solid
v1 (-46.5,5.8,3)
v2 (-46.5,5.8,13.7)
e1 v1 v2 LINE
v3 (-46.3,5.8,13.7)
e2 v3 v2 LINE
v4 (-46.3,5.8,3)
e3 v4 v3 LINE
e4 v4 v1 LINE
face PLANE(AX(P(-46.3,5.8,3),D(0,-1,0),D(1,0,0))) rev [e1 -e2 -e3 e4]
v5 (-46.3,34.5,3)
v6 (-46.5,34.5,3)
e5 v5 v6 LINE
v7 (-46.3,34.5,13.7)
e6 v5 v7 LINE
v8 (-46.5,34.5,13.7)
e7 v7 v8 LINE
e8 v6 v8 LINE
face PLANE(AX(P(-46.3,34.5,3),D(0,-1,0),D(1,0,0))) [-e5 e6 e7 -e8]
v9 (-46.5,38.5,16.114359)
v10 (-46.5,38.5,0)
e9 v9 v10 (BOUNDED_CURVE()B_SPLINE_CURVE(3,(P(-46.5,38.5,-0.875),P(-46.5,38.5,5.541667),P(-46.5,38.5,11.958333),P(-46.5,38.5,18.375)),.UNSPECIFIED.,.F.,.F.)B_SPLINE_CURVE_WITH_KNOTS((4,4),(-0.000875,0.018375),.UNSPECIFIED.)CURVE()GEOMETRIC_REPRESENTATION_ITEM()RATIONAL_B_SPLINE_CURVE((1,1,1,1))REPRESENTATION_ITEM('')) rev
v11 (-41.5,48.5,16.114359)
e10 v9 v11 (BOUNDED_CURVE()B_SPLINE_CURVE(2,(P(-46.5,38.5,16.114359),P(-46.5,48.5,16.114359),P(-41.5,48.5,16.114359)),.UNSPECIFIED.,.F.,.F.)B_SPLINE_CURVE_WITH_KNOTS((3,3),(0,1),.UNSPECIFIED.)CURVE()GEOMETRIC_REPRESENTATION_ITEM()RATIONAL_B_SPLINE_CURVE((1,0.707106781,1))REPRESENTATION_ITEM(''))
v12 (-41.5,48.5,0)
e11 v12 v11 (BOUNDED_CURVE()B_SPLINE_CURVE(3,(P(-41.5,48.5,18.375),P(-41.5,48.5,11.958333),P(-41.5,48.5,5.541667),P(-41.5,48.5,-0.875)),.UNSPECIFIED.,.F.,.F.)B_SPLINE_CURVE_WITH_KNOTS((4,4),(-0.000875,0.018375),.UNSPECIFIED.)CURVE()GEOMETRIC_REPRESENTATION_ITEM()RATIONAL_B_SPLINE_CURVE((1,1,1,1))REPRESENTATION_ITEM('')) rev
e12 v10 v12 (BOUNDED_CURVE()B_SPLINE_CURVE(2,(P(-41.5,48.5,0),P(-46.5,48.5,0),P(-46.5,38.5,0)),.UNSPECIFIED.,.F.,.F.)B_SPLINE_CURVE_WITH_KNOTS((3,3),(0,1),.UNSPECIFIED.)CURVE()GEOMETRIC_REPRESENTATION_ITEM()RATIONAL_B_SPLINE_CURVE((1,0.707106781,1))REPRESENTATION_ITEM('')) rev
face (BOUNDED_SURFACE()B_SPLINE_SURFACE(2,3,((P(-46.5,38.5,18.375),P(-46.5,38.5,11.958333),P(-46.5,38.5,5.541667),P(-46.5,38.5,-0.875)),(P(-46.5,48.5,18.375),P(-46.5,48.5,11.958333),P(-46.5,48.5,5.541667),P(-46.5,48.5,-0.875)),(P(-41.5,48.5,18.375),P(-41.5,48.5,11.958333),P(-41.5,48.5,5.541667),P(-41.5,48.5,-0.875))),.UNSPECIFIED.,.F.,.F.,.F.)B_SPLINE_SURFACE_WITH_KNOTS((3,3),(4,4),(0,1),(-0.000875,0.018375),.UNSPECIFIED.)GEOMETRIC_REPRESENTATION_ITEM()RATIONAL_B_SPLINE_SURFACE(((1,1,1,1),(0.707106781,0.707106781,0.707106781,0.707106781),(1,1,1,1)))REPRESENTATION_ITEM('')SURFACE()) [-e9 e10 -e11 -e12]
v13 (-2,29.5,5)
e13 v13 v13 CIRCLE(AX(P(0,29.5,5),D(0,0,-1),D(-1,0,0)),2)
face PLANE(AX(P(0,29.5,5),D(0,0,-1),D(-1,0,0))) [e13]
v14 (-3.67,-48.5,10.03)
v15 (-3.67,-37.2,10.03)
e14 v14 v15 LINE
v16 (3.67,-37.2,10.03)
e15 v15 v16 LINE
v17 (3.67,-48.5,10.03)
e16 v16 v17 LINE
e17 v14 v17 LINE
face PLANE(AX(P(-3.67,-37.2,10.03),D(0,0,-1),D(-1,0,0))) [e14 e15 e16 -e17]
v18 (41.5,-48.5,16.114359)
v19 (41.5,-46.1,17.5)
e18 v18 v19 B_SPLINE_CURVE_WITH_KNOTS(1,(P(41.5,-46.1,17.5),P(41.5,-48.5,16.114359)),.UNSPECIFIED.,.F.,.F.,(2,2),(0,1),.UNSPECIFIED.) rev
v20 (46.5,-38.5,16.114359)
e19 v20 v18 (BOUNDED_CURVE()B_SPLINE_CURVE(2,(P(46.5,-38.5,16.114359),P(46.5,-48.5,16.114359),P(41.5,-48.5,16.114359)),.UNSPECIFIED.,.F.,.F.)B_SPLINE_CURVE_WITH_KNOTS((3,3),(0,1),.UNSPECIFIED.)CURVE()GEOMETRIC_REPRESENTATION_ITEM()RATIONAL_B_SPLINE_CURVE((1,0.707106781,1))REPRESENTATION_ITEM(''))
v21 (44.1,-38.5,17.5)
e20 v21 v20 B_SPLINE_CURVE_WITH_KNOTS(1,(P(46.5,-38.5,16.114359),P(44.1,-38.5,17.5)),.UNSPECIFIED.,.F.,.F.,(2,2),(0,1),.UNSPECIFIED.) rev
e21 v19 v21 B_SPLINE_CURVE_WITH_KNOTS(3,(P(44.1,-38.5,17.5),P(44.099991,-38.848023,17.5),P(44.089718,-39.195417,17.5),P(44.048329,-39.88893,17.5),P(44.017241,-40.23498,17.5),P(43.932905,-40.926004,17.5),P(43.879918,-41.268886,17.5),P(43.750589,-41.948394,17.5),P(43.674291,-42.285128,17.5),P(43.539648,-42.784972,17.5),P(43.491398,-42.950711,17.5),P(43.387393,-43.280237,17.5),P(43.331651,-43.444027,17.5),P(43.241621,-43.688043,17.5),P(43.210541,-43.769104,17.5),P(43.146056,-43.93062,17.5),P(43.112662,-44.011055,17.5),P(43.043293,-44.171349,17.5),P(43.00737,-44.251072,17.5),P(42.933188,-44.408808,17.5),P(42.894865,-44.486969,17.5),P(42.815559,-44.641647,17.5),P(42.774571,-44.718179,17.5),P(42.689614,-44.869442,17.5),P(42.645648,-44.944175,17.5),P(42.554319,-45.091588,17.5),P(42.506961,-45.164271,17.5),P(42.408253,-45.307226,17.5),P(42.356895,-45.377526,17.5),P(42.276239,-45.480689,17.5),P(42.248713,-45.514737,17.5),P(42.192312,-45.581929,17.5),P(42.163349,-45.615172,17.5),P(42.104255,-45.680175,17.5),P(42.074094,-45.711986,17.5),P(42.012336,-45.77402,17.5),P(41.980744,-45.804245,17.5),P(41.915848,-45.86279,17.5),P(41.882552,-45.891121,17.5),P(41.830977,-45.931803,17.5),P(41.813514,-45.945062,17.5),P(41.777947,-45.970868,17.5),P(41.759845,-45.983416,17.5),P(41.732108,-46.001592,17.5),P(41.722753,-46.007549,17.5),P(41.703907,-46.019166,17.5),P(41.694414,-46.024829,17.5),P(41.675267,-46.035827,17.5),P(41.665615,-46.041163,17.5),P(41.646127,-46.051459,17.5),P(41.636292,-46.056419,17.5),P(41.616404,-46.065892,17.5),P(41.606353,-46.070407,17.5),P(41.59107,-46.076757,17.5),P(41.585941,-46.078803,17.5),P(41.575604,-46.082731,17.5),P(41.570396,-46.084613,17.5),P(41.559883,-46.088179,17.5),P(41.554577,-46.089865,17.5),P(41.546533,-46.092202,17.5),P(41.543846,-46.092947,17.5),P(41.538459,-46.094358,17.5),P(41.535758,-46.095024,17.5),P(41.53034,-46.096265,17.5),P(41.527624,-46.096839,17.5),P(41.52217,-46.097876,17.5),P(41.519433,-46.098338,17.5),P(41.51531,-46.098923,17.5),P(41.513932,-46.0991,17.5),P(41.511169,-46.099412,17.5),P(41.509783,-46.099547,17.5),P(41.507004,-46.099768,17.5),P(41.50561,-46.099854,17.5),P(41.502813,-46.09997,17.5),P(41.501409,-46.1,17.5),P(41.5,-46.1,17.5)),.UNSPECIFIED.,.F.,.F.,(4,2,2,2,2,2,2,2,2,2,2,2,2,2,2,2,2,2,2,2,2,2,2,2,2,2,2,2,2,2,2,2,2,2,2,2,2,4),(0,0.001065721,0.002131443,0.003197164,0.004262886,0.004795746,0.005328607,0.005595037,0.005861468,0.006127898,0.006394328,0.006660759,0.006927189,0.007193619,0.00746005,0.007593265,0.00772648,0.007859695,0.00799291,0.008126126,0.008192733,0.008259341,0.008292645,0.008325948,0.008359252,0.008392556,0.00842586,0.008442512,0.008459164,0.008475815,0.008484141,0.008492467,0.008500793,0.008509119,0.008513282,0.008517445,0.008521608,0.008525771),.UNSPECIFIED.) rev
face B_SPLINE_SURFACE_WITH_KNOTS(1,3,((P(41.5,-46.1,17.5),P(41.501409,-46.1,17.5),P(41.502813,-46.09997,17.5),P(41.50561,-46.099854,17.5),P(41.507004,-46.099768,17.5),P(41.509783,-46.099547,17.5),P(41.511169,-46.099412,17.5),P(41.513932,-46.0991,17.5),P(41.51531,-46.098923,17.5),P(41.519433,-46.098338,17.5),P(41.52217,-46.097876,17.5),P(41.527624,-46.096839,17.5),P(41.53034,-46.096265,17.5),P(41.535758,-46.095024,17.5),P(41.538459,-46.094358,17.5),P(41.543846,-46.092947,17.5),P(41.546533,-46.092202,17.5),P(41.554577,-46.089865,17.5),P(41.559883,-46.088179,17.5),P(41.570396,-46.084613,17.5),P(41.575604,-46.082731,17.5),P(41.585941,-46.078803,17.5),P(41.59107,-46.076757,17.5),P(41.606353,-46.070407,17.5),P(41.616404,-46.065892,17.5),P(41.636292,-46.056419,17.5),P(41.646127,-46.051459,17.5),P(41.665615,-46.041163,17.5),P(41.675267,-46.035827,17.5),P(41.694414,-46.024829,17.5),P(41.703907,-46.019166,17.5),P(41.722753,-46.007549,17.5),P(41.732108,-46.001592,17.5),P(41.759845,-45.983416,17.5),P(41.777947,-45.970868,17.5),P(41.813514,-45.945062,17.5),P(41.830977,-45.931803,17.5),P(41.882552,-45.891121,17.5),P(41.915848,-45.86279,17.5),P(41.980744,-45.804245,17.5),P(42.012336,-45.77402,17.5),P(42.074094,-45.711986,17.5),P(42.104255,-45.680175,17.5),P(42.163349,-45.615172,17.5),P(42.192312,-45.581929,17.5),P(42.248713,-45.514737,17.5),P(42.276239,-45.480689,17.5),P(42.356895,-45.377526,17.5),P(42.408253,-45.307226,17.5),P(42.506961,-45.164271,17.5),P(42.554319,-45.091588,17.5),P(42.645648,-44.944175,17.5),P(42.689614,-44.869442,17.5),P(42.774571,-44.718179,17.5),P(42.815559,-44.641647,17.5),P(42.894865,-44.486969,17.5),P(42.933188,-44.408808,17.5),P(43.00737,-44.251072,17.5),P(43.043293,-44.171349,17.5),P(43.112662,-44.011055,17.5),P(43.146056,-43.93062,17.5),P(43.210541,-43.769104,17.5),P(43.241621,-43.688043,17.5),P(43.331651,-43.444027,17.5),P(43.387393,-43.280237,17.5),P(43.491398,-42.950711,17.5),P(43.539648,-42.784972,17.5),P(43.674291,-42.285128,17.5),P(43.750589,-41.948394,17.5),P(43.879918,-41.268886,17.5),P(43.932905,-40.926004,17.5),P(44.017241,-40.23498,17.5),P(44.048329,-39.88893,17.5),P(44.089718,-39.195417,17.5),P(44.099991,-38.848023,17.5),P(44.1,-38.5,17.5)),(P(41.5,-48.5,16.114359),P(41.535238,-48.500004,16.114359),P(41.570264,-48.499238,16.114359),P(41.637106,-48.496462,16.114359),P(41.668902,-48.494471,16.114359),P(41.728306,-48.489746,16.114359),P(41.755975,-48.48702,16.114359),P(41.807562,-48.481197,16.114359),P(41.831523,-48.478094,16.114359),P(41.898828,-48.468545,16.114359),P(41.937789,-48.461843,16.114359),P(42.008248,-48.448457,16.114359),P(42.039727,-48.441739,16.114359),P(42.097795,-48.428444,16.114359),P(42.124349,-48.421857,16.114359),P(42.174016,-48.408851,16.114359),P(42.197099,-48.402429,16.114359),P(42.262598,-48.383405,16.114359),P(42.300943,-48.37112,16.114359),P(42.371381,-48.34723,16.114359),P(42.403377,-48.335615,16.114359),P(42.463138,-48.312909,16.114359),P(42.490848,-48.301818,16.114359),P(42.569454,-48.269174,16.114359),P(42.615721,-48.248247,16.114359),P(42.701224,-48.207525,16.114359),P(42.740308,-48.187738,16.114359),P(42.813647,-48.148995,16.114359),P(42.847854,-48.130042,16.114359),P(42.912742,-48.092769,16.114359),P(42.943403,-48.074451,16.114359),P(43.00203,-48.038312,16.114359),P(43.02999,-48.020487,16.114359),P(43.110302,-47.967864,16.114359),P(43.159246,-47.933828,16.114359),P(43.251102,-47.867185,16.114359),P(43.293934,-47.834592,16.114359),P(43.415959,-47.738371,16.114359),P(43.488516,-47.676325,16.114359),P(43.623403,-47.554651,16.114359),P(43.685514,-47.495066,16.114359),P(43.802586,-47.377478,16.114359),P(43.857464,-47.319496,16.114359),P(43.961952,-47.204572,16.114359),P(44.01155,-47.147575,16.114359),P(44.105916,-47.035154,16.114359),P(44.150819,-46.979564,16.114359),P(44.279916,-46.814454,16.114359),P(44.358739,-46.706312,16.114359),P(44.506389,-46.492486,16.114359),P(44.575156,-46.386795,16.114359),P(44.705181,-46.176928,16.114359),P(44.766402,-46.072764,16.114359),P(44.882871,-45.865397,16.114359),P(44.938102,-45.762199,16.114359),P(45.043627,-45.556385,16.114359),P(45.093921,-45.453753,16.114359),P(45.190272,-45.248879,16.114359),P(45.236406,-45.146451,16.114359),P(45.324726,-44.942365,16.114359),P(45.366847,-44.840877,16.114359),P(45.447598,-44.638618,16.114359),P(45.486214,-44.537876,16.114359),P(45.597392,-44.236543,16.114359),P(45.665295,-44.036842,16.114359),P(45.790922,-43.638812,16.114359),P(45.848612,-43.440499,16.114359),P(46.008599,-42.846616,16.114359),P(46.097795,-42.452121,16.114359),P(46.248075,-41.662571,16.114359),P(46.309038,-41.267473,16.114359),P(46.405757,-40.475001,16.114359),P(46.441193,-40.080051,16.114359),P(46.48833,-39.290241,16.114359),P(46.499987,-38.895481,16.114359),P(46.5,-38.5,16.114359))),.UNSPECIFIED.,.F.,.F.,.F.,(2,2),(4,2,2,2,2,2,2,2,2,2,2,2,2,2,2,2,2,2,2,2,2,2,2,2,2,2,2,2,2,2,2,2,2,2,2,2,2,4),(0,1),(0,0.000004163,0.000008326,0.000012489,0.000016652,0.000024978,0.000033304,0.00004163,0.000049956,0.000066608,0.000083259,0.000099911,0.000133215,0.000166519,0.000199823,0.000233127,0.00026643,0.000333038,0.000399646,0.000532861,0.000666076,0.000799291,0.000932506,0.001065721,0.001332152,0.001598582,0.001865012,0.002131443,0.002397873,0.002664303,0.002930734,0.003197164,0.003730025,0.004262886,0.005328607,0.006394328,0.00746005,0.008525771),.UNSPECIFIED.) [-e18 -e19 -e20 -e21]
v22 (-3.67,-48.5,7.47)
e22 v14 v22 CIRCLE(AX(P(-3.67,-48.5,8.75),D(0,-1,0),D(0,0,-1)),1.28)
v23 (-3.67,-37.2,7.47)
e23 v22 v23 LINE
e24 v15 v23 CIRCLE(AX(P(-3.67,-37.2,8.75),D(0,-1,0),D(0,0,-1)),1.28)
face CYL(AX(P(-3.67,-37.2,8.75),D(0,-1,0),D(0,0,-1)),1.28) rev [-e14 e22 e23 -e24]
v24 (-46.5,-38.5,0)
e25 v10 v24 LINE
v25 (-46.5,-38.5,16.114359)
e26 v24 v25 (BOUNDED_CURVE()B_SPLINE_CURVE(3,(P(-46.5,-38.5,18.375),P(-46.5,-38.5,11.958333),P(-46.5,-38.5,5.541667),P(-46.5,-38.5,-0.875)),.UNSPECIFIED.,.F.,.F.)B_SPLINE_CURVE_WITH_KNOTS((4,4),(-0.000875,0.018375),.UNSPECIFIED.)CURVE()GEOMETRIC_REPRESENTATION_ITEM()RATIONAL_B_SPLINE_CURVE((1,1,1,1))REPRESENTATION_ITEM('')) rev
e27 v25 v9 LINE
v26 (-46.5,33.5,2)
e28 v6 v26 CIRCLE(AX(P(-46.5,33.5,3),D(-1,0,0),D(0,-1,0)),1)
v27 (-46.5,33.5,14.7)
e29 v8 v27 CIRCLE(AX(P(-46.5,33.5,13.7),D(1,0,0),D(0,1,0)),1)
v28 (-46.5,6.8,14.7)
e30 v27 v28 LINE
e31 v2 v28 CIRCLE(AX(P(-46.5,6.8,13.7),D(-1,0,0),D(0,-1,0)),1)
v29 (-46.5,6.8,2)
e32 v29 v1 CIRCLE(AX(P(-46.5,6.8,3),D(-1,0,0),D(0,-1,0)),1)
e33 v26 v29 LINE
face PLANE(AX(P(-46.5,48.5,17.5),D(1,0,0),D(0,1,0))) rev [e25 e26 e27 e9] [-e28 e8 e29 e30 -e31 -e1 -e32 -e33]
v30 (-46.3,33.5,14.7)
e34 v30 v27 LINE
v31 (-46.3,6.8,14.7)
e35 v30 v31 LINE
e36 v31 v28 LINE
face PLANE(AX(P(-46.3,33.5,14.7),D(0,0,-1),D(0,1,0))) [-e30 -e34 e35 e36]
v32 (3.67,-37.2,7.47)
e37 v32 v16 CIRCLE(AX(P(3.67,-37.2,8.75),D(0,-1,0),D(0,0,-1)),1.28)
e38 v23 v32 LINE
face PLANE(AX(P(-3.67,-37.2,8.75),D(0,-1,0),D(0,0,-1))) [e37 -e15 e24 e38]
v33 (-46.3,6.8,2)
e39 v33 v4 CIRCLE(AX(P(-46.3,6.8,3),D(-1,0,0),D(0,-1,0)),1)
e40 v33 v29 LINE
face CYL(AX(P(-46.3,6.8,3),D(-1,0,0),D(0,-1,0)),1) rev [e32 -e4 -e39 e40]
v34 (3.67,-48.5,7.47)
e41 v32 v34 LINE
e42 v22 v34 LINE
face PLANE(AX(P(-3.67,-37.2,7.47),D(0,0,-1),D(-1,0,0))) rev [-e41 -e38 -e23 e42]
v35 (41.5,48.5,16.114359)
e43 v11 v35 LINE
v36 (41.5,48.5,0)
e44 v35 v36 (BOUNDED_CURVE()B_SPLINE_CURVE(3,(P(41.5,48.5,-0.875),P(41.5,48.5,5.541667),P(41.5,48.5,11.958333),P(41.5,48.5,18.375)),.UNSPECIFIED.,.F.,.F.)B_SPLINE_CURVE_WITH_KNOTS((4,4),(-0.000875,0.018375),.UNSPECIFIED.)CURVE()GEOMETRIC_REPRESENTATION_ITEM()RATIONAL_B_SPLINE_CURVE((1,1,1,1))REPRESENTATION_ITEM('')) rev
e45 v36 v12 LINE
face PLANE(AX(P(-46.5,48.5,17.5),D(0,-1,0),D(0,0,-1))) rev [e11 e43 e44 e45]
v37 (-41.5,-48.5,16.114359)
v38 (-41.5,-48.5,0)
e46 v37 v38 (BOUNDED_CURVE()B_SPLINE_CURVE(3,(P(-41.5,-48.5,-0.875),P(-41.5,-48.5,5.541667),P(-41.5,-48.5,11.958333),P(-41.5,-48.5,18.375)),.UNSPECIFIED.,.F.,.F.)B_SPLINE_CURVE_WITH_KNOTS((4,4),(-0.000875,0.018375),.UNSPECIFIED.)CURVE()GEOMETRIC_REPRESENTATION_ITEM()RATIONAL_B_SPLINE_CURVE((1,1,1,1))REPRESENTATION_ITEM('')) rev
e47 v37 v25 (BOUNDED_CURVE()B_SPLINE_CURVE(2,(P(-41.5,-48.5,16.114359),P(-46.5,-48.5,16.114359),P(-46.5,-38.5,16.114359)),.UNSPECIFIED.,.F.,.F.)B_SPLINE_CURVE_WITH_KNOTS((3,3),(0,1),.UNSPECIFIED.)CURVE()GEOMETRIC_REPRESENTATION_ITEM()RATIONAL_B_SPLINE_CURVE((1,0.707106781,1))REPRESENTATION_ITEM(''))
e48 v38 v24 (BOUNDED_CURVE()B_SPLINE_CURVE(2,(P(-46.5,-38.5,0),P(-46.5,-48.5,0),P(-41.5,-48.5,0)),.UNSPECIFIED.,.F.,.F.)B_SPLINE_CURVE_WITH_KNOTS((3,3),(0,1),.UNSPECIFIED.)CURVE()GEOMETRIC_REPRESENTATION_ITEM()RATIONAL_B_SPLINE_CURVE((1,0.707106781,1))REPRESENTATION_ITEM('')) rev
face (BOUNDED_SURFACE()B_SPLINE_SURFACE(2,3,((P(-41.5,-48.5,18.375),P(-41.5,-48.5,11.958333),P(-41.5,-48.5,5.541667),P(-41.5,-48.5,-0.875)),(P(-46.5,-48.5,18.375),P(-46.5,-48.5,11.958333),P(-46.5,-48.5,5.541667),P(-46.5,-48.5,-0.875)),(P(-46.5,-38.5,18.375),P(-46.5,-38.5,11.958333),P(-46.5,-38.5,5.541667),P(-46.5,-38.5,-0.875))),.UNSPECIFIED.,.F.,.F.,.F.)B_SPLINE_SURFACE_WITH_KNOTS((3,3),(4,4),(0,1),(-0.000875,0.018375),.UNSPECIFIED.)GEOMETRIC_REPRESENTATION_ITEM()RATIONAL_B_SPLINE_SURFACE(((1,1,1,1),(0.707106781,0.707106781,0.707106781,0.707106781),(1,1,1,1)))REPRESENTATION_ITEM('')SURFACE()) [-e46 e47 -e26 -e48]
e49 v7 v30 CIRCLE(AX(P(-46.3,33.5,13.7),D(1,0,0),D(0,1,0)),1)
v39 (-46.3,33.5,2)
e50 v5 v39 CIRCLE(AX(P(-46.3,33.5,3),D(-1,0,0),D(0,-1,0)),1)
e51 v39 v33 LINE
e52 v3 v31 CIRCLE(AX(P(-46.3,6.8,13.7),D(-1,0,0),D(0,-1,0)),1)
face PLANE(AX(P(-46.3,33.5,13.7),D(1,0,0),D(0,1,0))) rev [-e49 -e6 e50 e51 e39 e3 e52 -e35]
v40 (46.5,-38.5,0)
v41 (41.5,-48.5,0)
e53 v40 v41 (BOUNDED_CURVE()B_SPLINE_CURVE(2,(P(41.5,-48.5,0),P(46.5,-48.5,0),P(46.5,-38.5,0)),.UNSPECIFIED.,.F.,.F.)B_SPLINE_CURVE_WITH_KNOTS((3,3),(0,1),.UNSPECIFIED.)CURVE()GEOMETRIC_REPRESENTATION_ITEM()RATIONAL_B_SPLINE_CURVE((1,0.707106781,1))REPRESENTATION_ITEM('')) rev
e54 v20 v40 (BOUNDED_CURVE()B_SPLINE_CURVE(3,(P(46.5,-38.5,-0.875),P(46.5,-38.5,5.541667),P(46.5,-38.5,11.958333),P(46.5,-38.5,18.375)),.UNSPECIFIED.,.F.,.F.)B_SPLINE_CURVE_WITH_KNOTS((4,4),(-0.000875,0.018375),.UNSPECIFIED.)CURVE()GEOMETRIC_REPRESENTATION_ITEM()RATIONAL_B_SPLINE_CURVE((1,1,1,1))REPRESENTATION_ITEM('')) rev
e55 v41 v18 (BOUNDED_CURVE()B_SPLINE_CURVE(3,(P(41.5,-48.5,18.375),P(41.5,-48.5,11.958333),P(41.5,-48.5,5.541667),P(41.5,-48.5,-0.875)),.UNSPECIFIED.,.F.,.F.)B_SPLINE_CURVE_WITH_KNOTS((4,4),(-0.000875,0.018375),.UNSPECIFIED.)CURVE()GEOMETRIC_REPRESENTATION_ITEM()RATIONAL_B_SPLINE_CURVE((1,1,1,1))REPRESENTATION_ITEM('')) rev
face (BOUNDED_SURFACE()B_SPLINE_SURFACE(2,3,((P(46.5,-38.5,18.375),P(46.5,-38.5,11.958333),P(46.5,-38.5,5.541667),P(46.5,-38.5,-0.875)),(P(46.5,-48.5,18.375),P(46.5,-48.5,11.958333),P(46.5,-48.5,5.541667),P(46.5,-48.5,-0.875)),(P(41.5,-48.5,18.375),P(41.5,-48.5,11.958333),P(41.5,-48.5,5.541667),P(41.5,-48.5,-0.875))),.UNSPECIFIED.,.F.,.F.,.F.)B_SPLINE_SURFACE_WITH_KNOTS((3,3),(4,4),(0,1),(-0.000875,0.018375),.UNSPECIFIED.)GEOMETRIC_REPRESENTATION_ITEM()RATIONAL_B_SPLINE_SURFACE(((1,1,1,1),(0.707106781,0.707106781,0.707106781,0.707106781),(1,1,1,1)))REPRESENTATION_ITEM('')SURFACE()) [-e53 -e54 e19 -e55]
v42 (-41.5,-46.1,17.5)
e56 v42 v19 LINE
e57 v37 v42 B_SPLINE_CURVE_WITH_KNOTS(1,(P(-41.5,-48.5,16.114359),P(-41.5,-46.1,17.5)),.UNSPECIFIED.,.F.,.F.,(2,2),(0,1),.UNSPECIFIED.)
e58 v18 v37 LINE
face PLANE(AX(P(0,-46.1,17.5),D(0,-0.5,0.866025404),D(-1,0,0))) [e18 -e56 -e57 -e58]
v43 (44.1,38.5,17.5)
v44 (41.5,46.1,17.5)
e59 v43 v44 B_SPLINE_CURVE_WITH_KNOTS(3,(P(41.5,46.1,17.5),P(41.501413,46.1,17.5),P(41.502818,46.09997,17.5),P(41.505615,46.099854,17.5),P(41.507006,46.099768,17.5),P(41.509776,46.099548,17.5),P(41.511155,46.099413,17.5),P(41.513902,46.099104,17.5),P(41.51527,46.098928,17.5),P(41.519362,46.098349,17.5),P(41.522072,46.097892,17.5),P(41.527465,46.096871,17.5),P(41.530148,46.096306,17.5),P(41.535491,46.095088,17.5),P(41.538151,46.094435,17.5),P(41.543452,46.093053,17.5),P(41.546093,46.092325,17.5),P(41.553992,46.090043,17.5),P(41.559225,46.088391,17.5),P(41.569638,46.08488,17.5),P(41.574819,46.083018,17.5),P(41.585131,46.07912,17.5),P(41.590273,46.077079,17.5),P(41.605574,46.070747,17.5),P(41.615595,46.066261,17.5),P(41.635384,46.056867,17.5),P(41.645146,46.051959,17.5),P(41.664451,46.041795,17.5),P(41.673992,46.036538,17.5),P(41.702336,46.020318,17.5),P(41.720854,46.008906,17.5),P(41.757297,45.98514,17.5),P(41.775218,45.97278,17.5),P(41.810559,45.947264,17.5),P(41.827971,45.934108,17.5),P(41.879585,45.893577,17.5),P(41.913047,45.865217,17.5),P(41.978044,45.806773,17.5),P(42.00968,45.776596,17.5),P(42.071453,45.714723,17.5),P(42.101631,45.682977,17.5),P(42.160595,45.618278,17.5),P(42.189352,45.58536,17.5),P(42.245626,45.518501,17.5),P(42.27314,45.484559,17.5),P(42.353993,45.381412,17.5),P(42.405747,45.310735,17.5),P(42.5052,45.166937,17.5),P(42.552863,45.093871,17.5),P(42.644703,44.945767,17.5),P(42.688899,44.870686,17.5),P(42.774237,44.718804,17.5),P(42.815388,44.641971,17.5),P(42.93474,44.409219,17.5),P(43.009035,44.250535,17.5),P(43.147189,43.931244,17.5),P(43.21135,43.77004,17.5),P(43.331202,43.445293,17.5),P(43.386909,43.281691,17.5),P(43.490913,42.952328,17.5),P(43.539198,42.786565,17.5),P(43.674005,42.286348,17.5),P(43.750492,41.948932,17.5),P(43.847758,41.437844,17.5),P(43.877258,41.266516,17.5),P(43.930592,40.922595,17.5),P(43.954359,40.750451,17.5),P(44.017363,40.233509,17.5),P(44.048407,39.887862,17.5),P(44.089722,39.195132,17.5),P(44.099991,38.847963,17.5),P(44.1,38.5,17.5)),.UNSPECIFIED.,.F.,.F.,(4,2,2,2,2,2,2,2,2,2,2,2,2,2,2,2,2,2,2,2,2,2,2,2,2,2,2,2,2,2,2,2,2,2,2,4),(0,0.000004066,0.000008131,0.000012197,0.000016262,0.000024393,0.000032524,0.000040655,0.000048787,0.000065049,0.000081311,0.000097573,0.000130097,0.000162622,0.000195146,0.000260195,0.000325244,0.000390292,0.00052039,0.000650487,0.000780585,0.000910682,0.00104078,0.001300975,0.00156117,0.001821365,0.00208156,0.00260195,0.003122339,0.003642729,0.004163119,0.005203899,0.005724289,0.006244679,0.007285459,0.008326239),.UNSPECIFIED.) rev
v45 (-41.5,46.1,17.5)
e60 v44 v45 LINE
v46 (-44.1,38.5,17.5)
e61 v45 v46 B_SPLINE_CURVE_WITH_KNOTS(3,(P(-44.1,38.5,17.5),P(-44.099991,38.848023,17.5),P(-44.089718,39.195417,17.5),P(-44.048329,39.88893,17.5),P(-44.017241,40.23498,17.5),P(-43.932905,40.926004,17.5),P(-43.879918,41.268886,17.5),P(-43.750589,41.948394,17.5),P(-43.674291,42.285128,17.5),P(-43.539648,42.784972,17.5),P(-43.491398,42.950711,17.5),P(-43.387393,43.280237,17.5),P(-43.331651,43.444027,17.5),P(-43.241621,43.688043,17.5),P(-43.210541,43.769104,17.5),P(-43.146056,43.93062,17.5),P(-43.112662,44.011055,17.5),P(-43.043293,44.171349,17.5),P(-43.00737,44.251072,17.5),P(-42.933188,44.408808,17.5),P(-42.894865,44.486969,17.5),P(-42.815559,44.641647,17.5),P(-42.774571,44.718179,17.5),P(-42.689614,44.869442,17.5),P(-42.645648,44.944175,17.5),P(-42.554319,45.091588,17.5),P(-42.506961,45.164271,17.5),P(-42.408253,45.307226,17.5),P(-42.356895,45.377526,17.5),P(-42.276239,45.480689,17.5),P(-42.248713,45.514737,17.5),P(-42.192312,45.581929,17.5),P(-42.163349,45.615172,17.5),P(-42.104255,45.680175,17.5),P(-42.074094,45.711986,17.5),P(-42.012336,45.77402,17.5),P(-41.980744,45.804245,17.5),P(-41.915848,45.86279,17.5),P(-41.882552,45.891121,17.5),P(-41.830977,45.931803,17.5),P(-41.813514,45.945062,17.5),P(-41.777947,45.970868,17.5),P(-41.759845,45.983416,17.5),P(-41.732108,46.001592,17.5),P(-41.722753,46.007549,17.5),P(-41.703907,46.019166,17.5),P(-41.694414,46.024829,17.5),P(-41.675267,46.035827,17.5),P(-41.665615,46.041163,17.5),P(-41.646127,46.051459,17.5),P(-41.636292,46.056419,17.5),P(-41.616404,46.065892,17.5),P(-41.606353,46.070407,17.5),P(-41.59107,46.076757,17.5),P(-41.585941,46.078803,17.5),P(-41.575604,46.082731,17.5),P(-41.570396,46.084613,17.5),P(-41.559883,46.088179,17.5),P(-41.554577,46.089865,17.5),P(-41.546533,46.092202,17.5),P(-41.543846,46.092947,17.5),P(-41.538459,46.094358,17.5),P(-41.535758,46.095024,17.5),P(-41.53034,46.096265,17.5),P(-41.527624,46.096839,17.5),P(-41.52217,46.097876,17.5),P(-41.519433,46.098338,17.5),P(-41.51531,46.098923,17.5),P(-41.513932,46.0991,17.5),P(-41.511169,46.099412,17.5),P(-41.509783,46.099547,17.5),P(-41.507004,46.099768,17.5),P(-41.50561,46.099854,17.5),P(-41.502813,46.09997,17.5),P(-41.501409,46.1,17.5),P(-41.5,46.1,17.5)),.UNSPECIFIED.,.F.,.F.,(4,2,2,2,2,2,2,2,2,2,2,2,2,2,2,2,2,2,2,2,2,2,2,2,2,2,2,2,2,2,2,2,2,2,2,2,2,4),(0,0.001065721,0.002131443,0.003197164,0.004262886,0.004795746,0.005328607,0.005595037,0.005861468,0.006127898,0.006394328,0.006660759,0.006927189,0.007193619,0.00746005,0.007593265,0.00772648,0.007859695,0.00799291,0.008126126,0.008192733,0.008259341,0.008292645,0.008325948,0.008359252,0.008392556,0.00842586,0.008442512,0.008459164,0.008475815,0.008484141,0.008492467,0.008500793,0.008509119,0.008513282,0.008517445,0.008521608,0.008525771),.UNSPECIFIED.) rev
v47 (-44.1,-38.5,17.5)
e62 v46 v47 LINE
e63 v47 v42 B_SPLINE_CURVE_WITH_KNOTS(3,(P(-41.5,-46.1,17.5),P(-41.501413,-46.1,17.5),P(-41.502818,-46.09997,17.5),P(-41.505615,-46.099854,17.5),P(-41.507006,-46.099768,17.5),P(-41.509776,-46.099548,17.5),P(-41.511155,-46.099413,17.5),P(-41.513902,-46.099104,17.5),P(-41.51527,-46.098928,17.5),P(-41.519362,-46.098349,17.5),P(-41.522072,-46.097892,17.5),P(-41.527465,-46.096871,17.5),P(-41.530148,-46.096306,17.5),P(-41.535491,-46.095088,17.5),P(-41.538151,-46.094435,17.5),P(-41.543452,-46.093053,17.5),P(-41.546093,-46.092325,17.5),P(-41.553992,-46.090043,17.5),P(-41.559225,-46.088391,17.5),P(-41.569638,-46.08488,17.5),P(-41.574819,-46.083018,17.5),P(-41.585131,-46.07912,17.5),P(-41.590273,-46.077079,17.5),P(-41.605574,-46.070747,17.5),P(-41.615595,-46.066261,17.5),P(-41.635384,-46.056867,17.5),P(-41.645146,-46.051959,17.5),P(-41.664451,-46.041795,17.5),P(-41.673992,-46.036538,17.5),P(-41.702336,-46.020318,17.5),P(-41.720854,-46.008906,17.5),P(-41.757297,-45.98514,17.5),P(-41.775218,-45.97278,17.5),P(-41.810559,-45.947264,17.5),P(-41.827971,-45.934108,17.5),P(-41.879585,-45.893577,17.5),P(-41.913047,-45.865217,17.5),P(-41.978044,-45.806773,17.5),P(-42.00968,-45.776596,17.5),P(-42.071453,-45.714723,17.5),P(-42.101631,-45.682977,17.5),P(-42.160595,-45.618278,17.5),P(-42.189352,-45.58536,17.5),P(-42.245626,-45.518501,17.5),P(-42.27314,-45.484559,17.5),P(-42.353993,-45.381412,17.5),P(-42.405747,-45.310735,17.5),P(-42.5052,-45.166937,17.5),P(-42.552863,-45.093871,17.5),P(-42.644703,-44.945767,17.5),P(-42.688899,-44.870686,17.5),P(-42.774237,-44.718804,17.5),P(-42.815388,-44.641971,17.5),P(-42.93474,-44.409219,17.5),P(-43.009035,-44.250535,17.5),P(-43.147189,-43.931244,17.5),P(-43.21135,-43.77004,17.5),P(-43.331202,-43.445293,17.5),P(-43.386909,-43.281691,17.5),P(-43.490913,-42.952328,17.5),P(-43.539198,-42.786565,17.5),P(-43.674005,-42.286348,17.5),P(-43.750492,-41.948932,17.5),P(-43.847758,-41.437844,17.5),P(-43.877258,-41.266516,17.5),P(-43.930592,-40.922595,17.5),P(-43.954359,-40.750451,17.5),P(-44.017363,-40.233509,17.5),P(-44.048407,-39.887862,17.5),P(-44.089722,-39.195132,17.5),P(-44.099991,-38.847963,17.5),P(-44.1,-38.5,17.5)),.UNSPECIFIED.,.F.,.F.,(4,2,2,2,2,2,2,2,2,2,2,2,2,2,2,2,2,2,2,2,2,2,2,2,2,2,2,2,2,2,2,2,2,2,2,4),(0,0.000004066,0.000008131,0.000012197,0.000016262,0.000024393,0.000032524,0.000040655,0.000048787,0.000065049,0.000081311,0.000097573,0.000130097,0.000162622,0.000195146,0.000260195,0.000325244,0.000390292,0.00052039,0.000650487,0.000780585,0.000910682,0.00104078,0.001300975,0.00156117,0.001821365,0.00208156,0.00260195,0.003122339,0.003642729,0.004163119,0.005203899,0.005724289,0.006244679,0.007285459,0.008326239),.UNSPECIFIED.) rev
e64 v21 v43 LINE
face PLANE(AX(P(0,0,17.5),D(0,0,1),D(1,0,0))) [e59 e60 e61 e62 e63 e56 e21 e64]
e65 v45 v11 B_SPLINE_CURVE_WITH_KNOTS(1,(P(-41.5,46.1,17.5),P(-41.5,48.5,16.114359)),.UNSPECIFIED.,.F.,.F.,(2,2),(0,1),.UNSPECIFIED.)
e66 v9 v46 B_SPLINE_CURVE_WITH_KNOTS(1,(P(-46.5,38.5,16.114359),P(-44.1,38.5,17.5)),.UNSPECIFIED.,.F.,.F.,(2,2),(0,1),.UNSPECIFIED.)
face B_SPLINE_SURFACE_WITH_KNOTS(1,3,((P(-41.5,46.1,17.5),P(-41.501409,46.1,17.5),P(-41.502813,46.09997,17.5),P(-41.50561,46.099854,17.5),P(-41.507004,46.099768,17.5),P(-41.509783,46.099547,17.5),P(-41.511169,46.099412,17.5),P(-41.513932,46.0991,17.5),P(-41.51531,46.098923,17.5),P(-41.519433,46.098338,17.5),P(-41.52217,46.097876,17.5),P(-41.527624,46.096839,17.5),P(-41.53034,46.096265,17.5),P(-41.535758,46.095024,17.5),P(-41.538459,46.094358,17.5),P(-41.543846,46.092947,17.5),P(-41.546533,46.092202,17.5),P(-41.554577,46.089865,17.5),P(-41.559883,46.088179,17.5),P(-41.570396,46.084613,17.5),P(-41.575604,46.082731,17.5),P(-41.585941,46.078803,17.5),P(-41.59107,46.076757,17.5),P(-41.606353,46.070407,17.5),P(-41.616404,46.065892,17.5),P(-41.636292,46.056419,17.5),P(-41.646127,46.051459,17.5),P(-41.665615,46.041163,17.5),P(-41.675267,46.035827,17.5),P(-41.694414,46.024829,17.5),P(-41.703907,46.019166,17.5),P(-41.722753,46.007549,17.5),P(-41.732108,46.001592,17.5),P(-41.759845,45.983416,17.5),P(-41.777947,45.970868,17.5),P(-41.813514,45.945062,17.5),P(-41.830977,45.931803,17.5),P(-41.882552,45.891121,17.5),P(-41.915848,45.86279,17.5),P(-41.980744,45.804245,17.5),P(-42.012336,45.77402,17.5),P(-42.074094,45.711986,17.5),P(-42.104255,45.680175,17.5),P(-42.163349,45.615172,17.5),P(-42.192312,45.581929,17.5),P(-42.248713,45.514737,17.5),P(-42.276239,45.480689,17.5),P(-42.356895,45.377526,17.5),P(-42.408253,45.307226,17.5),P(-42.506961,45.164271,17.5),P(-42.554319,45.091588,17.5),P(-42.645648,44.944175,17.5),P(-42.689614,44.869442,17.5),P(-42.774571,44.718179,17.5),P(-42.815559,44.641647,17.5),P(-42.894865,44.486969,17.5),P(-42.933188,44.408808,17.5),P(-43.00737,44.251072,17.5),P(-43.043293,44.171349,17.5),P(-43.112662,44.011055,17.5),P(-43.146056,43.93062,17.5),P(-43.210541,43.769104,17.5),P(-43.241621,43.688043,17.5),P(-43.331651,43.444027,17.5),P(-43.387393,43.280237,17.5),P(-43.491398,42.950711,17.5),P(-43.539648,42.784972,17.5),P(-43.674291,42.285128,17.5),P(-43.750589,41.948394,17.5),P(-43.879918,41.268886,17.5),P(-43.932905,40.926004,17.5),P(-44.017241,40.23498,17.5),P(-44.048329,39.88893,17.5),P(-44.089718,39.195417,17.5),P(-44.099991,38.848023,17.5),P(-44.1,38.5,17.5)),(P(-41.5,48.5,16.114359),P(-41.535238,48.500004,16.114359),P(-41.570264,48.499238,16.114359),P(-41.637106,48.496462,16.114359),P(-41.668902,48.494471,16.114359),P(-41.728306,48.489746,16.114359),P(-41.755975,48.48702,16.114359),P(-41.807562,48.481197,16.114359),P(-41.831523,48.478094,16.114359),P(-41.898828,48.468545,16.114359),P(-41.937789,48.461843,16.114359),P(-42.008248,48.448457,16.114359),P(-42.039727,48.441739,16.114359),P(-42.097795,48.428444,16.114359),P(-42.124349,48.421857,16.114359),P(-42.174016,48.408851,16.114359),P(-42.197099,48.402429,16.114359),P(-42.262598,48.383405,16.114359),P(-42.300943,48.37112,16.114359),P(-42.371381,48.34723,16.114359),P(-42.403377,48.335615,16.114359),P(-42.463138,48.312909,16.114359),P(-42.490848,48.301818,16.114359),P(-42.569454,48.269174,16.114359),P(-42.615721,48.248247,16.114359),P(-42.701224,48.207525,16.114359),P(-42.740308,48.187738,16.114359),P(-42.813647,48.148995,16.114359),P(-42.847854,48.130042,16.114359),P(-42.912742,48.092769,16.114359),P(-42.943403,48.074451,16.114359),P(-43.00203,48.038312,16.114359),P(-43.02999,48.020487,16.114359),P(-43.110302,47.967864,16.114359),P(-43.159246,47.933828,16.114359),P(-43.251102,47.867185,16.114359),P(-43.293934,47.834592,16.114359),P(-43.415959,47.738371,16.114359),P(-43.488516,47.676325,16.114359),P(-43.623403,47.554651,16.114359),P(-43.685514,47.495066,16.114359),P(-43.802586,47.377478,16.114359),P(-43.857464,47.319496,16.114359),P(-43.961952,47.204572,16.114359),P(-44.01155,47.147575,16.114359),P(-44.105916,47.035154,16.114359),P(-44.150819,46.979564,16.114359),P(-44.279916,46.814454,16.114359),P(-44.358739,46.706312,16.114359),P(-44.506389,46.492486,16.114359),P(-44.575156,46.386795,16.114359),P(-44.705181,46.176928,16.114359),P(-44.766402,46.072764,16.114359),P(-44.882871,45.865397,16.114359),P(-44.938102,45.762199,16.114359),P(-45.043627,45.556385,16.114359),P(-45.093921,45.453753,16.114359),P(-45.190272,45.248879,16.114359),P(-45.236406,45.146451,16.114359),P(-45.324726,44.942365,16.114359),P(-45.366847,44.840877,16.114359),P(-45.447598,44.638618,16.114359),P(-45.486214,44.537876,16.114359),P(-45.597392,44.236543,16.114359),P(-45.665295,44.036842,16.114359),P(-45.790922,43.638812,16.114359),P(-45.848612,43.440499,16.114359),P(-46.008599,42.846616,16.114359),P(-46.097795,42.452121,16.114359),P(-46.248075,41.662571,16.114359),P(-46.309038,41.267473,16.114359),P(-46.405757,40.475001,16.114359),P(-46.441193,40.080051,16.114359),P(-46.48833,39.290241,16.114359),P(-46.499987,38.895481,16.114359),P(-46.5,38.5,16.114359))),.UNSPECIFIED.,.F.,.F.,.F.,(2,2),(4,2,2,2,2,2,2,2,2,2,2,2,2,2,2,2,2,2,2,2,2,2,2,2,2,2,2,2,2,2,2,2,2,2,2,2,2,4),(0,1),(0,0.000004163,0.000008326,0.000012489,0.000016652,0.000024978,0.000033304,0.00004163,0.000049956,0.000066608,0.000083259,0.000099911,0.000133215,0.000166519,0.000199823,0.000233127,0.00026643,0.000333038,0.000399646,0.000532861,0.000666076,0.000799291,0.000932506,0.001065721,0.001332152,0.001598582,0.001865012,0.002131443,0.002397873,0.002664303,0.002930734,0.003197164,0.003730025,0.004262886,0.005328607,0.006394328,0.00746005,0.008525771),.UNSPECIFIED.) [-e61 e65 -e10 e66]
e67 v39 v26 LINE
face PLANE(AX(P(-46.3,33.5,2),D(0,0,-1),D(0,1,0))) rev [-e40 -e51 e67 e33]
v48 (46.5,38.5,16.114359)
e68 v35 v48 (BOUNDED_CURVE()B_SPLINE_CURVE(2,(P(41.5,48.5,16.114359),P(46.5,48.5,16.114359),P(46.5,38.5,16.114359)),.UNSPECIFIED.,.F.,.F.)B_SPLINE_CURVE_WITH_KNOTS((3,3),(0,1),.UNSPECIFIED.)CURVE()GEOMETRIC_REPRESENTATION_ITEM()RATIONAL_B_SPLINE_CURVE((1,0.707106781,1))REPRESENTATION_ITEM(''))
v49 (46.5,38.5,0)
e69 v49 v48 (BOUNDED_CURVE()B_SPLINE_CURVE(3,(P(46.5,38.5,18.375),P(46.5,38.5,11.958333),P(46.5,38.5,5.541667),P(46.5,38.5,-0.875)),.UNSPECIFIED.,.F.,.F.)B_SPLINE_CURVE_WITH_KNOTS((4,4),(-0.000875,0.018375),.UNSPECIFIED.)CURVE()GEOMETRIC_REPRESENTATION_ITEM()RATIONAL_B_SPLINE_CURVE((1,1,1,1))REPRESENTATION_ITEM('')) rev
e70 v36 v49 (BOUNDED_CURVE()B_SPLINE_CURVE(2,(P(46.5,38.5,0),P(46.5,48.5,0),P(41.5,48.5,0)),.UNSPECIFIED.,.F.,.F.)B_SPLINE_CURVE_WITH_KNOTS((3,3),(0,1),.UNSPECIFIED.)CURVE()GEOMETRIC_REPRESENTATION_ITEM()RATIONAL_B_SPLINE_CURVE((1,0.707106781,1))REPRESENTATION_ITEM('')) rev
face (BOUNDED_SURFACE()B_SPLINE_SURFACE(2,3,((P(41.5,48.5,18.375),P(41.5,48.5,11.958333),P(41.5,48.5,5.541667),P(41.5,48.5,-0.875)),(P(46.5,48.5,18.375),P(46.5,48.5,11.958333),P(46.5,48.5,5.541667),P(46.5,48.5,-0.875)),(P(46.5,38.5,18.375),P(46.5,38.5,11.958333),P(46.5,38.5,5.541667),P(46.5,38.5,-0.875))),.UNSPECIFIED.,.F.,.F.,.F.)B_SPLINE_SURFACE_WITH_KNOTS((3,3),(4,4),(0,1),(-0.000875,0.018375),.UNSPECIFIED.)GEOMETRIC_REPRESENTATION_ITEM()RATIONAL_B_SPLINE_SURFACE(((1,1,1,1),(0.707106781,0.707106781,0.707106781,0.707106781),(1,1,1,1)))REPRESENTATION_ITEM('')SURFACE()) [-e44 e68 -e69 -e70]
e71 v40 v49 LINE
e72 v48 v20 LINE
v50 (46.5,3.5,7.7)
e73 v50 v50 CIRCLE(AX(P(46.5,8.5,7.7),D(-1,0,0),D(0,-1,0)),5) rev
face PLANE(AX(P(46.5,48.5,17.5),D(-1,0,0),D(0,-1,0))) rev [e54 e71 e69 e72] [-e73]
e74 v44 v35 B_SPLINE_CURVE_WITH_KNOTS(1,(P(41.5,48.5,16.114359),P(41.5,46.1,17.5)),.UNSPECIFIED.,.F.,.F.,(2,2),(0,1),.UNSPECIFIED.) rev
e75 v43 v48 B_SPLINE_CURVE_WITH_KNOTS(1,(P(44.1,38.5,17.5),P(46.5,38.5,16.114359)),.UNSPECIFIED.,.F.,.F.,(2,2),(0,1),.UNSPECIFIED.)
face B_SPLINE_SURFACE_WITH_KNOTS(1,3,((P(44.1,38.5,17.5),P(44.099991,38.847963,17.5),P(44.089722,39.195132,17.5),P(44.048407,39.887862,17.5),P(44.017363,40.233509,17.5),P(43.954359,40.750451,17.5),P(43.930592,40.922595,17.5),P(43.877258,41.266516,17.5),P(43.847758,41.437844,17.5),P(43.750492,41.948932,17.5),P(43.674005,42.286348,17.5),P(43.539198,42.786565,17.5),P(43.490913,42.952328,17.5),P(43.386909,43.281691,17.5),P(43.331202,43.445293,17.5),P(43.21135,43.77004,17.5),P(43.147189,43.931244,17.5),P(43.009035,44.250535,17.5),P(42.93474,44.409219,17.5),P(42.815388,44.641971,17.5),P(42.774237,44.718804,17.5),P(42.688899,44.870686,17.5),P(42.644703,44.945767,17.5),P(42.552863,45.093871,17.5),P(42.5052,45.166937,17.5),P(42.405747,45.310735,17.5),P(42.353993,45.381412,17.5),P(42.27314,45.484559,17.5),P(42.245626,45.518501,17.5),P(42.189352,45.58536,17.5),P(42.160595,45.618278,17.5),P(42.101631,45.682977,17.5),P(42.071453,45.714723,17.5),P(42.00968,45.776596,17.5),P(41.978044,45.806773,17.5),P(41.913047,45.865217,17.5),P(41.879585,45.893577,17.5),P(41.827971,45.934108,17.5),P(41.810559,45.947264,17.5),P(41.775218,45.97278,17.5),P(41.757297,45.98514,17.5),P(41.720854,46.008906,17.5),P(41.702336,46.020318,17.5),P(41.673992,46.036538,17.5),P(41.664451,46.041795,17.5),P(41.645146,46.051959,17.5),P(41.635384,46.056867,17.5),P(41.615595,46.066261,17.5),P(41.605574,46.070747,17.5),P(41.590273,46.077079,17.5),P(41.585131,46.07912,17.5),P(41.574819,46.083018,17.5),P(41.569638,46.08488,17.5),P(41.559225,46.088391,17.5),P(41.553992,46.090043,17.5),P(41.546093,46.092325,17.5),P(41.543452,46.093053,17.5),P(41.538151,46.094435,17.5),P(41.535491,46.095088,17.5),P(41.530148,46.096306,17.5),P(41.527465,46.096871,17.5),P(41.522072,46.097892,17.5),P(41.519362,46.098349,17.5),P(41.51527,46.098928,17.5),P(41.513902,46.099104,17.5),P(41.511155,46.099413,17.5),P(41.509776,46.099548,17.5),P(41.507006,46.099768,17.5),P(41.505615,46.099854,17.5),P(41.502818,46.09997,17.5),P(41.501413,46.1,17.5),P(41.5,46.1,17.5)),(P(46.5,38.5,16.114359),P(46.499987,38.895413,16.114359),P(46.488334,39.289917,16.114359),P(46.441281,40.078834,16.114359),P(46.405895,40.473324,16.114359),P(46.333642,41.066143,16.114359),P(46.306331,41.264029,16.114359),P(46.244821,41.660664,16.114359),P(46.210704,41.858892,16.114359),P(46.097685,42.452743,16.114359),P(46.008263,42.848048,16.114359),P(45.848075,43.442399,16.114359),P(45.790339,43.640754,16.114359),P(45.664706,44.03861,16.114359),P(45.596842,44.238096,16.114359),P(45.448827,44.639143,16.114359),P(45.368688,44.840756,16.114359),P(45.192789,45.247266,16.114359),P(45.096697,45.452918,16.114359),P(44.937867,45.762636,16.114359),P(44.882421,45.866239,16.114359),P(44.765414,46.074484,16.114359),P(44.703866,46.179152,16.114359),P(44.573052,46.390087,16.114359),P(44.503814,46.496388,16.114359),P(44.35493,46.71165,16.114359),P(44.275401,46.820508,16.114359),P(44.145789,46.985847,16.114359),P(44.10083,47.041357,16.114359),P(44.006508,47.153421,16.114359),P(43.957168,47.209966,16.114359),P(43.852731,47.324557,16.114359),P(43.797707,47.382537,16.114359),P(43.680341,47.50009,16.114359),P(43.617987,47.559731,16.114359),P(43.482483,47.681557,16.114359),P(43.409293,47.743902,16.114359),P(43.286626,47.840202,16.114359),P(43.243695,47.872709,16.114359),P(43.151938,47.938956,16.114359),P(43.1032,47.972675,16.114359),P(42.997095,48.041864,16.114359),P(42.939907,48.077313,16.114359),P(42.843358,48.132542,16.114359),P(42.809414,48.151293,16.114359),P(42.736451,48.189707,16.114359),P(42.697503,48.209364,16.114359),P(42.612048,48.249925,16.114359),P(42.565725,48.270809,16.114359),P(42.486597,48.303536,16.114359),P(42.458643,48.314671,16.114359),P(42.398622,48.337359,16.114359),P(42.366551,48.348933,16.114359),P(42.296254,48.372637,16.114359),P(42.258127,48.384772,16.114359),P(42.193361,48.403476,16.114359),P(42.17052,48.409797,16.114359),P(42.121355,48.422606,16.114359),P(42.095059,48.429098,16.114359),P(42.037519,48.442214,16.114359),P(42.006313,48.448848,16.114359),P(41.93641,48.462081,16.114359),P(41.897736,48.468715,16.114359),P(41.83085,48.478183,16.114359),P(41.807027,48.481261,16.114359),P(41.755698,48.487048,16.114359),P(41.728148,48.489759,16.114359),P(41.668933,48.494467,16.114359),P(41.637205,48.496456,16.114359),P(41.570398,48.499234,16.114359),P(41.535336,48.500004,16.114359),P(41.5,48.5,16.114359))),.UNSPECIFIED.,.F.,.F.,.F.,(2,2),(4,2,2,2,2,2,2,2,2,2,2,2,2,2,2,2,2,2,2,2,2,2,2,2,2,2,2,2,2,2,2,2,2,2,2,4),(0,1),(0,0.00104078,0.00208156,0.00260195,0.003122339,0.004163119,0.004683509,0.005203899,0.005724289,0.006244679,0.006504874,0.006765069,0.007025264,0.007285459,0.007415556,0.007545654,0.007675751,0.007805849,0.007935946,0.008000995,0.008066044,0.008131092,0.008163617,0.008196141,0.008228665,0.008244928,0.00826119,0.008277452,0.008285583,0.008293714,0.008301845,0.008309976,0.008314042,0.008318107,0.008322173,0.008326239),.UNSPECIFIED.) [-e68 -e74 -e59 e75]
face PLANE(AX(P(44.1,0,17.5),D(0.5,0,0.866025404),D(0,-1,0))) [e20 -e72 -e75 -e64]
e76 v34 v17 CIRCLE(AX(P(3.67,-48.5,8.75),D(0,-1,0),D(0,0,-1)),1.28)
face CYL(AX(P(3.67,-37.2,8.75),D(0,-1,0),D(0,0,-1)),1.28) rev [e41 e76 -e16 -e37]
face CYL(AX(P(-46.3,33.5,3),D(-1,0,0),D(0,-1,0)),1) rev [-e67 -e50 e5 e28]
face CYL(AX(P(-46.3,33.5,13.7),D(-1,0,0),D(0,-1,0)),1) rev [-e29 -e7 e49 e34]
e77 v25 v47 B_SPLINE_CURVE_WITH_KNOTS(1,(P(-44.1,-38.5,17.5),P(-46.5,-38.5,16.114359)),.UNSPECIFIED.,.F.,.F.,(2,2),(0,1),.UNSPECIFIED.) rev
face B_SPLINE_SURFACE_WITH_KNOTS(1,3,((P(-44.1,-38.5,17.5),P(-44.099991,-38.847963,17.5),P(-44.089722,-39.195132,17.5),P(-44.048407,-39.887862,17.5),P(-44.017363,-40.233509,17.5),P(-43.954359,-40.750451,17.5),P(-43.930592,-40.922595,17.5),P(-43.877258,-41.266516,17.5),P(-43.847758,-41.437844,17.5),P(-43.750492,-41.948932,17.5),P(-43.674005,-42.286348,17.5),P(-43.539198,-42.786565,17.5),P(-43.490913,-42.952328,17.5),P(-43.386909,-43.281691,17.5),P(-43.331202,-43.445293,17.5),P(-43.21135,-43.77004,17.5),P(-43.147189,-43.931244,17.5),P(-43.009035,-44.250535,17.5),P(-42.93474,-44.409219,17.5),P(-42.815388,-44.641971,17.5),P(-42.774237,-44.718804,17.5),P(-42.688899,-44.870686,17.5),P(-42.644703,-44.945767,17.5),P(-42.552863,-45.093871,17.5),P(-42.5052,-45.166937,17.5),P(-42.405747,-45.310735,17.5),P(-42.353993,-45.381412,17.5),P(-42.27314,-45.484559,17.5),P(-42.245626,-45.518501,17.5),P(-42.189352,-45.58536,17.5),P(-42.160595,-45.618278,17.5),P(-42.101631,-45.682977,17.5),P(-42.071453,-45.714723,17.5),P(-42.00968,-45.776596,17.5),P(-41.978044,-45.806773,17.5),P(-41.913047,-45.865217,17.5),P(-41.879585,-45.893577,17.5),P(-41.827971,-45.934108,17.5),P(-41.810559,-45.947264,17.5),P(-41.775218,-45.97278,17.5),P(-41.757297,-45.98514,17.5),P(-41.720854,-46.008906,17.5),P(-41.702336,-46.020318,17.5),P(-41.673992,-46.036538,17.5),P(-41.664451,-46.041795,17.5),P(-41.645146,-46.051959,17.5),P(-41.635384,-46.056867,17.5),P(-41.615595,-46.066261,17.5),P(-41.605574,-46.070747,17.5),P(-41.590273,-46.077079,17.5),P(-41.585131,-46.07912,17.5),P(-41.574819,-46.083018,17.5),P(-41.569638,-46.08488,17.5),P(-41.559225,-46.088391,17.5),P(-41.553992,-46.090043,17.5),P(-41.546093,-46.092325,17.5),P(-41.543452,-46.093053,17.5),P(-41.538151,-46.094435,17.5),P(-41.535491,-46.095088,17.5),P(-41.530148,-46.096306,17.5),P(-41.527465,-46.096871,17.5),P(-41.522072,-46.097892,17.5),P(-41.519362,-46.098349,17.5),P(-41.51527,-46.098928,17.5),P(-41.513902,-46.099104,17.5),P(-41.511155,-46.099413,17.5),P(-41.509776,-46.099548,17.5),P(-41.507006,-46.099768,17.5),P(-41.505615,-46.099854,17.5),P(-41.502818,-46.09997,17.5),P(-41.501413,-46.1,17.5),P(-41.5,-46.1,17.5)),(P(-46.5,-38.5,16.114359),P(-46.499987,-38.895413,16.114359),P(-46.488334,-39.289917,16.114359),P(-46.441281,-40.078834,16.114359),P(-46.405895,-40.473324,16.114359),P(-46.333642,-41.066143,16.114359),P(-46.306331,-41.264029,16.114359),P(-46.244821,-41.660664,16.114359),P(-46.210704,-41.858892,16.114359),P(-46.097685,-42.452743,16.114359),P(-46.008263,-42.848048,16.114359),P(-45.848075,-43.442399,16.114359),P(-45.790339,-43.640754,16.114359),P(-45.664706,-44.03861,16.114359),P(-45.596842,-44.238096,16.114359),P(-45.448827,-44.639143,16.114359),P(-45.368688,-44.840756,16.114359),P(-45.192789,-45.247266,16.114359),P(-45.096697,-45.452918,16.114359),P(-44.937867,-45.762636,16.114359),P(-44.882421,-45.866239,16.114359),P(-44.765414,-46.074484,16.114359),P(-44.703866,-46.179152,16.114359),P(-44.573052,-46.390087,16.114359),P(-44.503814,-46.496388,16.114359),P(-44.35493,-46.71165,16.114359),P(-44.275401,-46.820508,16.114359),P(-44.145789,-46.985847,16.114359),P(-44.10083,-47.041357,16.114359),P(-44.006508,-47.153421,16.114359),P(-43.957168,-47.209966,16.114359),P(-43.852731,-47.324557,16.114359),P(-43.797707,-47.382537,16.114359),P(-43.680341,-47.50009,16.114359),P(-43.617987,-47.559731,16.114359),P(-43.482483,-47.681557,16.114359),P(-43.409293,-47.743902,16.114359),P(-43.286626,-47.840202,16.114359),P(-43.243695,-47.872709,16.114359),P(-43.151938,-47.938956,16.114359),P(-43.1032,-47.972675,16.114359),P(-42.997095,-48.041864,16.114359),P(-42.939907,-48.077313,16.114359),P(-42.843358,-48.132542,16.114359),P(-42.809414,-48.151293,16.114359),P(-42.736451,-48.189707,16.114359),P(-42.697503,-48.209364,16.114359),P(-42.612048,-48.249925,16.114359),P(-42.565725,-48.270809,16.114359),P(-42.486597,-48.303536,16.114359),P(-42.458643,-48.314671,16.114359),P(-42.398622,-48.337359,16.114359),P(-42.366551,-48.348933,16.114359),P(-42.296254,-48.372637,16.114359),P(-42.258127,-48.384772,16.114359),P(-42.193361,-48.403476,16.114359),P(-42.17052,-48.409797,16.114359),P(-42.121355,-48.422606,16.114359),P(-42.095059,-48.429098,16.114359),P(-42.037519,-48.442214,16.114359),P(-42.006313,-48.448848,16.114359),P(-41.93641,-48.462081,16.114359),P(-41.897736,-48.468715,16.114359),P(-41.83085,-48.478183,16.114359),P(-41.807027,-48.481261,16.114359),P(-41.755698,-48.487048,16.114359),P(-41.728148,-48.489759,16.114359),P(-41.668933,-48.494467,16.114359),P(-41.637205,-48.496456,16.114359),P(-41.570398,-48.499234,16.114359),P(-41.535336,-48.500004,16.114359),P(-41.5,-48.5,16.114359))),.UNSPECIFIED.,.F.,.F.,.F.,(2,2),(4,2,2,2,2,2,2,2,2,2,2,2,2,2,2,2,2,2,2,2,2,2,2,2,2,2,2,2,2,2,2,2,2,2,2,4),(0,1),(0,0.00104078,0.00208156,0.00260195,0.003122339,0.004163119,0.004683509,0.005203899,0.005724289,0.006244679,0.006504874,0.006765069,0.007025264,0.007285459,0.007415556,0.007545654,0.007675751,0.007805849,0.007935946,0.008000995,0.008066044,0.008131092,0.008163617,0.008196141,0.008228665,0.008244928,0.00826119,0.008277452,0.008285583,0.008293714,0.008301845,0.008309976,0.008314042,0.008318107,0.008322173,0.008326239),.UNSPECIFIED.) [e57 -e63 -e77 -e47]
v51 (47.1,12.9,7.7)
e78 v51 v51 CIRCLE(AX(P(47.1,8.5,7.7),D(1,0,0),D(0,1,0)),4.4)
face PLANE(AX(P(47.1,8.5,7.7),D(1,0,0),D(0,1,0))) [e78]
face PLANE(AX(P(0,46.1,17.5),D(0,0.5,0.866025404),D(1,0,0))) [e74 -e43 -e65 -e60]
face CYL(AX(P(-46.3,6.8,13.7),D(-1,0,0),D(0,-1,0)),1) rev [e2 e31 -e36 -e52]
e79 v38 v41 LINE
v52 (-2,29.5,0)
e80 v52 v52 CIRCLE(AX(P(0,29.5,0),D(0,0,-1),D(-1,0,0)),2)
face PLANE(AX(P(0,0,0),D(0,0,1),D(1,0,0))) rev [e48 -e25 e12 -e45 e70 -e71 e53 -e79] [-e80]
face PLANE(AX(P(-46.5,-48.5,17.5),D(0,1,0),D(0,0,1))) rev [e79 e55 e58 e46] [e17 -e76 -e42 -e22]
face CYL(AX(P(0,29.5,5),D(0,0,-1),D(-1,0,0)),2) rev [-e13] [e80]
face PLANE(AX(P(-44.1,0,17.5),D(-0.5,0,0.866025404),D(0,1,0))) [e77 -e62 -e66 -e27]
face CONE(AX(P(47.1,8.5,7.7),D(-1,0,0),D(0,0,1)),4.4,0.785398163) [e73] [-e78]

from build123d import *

# Parameters (mm, degrees)
SKETCH1_W           = 93
SKETCH1_H           = 97
BOSS_EXTRUDE1_DEPTH = 17.5
FILLET1_SIZE        = 5
FILLET1_SIZE_2      = 10
FILLET2_SIZE        = 10
FILLET2_SIZE_2      = 5
FILLET3_SIZE        = 5
FILLET3_SIZE_2      = 10
SKETCH2_R           = 1.28
SKETCH2_W           = 7.34
SKETCH2_H           = 2.56
CUT_EXTRUDE1_DEPTH  = 11.3
SKETCH3_R           = 5
BOSS_EXTRUDE2_DEPTH = 0.6
CHAMFER1_SIZE       = 0.6
CUT_EXTRUDE2_DEPTH  = 0.2
CHAMFER4_SIZE       = 2.4
CHAMFER4_SIZE2      = 1.385640646
SKETCH5_R           = 2
CUT_EXTRUDE3_DEPTH  = 5


# Some blends are built 0.0001 mm under size
with BuildPart() as part:
    # Sketch1 → Boss-Extrude1 (new body)
    with BuildSketch(Plane.XY):
        Rectangle(SKETCH1_W, SKETCH1_H)
    extrude(amount=BOSS_EXTRUDE1_DEPTH)

    # Fillet1
    # an asymmetric fillet: 10, 5 mm, written as the material it takes off along each edge
    with BuildSketch(Plane(origin=(-46.5, 48.5, -25), x_dir=(1, 0, 0), z_dir=(0, 0, 1))) as fillet1_piece_1:
        with BuildLine():
            Bezier((FILLET1_SIZE, 0), (0, 0), (0, -FILLET1_SIZE_2), weights=[1, 0.707106781, 1])
            Line((0, -FILLET1_SIZE_2), (0, 0))
            Line((0, 0), (FILLET1_SIZE, 0))
        make_face()
    extrude(amount=67.5, mode=Mode.SUBTRACT)
    with BuildSketch(Plane(origin=(46.5, -48.5, -25), x_dir=(0, 1, 0), z_dir=(0, 0, 1))) as fillet1_piece_2:
        with BuildLine():
            Bezier((FILLET1_SIZE_2, 0), (0, 0), (0, FILLET1_SIZE), weights=[1, 0.707106781, 1])
            Line((0, FILLET1_SIZE), (0, 0))
            Line((0, 0), (FILLET1_SIZE_2, 0))
        make_face()
    extrude(amount=67.5, mode=Mode.SUBTRACT)

    # Fillet2
    # an asymmetric fillet: 10, 5 mm, written as the material it takes off along each edge
    with BuildSketch(Plane(origin=(-46.5, -48.5, -25), x_dir=(0, 1, 0), z_dir=(0, 0, 1))) as fillet2_piece_1:
        with BuildLine():
            Bezier((FILLET2_SIZE, 0), (0, 0), (0, -FILLET2_SIZE_2), weights=[1, 0.707106781, 1])
            Line((0, -FILLET2_SIZE_2), (0, 0))
            Line((0, 0), (FILLET2_SIZE, 0))
        make_face()
    extrude(amount=67.5, mode=Mode.SUBTRACT)

    # Fillet3
    # an asymmetric fillet: 10, 5 mm, written as the material it takes off along each edge
    with BuildSketch(Plane(origin=(46.5, 48.5, -25), x_dir=(-1, 0, 0), z_dir=(0, 0, 1))) as fillet3_piece_1:
        with BuildLine():
            Bezier((FILLET3_SIZE, 0), (0, 0), (0, FILLET3_SIZE_2), weights=[1, 0.707106781, 1])
            Line((0, FILLET3_SIZE_2), (0, 0))
            Line((0, 0), (FILLET3_SIZE, 0))
        make_face()
    extrude(amount=67.5, mode=Mode.SUBTRACT)

    # Sketch2 → Cut-Extrude1 (cut)
    with BuildSketch(Plane.XZ.offset(48.5)):
        with Locations((-3.67, 8.75)):
            Circle(SKETCH2_R)
        with Locations((3.67, 8.75)):
            Circle(SKETCH2_R)
        with Locations((0, 8.75)):
            Rectangle(SKETCH2_W, SKETCH2_H)
    extrude(amount=-CUT_EXTRUDE1_DEPTH, mode=Mode.SUBTRACT)

    # Sketch3 → Boss-Extrude2 (add)
    with BuildSketch(Plane(origin=(46.5, 0, 0), x_dir=(0, 0, -1), z_dir=(1, 0, 0))):
        with Locations(Location((-7.7, 8.5, 0), (0, 0, 270))):
            Circle(SKETCH3_R)
    extrude(amount=BOSS_EXTRUDE2_DEPTH)

    # Chamfer1
    chamfer1_edges = [part.edges().sort_by_distance(p)[0] for p in [
        (47.1, 13.5, 7.7),
    ]]
    chamfer(chamfer1_edges, length=CHAMFER1_SIZE - 0.0001)  # a hair under: the kernel refuses the full size

    # Sketch4 → Cut-Extrude2 (cut)
    with BuildSketch(Plane.ZY.offset(46.5)):
        with BuildLine():
            Line((3, 34.5), (13.7, 34.5))
            ThreePointArc((13.7, 34.5), (14.407106781, 34.207106781), (14.7, 33.5))
            Line((14.7, 33.5), (14.7, 6.8))
            ThreePointArc((14.7, 6.8), (14.407106781, 6.092893219), (13.7, 5.8))
            Line((13.7, 5.8), (3, 5.8))
            ThreePointArc((3, 5.8), (2.292893219, 6.092893219), (2, 6.8))
            Line((2, 6.8), (2, 33.5))
            ThreePointArc((2, 33.5), (2.292893219, 34.207106781), (3, 34.5))
        make_face()
    extrude(amount=-CUT_EXTRUDE2_DEPTH, mode=Mode.SUBTRACT)

    # Chamfer4
    chamfer4_edges = [part.edges().sort_by_distance(p)[0] for p in [
        (-45.520581957, 44.444718915, 17.5),
        (-46.5, 0, 17.5),
        (0, 48.5, 17.5),
        (-45.52058196, -44.444718917, 17.5),
        (45.520581957, 44.444718915, 17.5),
        (0, -48.5, 17.5),
        (46.5, 0, 17.5),
        (45.52058196, -44.444718917, 17.5),
    ]]
    chamfer4_side = [part.faces().sort_by_distance(p)[0] for p in [
        (0, 4.215e-06, 17.5),
    ]]
    chamfer(chamfer4_edges, length=CHAMFER4_SIZE, length2=CHAMFER4_SIZE2, reference=chamfer4_side[0])

    # Sketch5 → Cut-Extrude3 (cut)
    with BuildSketch(Plane(origin=(0, 0, 0), x_dir=(-1, 0, 0), z_dir=(0, 0, -1))):
        with Locations((0, 29.5)):
            Circle(SKETCH5_R)
    extrude(amount=-CUT_EXTRUDE3_DEPTH, mode=Mode.SUBTRACT)


solid = part.part
